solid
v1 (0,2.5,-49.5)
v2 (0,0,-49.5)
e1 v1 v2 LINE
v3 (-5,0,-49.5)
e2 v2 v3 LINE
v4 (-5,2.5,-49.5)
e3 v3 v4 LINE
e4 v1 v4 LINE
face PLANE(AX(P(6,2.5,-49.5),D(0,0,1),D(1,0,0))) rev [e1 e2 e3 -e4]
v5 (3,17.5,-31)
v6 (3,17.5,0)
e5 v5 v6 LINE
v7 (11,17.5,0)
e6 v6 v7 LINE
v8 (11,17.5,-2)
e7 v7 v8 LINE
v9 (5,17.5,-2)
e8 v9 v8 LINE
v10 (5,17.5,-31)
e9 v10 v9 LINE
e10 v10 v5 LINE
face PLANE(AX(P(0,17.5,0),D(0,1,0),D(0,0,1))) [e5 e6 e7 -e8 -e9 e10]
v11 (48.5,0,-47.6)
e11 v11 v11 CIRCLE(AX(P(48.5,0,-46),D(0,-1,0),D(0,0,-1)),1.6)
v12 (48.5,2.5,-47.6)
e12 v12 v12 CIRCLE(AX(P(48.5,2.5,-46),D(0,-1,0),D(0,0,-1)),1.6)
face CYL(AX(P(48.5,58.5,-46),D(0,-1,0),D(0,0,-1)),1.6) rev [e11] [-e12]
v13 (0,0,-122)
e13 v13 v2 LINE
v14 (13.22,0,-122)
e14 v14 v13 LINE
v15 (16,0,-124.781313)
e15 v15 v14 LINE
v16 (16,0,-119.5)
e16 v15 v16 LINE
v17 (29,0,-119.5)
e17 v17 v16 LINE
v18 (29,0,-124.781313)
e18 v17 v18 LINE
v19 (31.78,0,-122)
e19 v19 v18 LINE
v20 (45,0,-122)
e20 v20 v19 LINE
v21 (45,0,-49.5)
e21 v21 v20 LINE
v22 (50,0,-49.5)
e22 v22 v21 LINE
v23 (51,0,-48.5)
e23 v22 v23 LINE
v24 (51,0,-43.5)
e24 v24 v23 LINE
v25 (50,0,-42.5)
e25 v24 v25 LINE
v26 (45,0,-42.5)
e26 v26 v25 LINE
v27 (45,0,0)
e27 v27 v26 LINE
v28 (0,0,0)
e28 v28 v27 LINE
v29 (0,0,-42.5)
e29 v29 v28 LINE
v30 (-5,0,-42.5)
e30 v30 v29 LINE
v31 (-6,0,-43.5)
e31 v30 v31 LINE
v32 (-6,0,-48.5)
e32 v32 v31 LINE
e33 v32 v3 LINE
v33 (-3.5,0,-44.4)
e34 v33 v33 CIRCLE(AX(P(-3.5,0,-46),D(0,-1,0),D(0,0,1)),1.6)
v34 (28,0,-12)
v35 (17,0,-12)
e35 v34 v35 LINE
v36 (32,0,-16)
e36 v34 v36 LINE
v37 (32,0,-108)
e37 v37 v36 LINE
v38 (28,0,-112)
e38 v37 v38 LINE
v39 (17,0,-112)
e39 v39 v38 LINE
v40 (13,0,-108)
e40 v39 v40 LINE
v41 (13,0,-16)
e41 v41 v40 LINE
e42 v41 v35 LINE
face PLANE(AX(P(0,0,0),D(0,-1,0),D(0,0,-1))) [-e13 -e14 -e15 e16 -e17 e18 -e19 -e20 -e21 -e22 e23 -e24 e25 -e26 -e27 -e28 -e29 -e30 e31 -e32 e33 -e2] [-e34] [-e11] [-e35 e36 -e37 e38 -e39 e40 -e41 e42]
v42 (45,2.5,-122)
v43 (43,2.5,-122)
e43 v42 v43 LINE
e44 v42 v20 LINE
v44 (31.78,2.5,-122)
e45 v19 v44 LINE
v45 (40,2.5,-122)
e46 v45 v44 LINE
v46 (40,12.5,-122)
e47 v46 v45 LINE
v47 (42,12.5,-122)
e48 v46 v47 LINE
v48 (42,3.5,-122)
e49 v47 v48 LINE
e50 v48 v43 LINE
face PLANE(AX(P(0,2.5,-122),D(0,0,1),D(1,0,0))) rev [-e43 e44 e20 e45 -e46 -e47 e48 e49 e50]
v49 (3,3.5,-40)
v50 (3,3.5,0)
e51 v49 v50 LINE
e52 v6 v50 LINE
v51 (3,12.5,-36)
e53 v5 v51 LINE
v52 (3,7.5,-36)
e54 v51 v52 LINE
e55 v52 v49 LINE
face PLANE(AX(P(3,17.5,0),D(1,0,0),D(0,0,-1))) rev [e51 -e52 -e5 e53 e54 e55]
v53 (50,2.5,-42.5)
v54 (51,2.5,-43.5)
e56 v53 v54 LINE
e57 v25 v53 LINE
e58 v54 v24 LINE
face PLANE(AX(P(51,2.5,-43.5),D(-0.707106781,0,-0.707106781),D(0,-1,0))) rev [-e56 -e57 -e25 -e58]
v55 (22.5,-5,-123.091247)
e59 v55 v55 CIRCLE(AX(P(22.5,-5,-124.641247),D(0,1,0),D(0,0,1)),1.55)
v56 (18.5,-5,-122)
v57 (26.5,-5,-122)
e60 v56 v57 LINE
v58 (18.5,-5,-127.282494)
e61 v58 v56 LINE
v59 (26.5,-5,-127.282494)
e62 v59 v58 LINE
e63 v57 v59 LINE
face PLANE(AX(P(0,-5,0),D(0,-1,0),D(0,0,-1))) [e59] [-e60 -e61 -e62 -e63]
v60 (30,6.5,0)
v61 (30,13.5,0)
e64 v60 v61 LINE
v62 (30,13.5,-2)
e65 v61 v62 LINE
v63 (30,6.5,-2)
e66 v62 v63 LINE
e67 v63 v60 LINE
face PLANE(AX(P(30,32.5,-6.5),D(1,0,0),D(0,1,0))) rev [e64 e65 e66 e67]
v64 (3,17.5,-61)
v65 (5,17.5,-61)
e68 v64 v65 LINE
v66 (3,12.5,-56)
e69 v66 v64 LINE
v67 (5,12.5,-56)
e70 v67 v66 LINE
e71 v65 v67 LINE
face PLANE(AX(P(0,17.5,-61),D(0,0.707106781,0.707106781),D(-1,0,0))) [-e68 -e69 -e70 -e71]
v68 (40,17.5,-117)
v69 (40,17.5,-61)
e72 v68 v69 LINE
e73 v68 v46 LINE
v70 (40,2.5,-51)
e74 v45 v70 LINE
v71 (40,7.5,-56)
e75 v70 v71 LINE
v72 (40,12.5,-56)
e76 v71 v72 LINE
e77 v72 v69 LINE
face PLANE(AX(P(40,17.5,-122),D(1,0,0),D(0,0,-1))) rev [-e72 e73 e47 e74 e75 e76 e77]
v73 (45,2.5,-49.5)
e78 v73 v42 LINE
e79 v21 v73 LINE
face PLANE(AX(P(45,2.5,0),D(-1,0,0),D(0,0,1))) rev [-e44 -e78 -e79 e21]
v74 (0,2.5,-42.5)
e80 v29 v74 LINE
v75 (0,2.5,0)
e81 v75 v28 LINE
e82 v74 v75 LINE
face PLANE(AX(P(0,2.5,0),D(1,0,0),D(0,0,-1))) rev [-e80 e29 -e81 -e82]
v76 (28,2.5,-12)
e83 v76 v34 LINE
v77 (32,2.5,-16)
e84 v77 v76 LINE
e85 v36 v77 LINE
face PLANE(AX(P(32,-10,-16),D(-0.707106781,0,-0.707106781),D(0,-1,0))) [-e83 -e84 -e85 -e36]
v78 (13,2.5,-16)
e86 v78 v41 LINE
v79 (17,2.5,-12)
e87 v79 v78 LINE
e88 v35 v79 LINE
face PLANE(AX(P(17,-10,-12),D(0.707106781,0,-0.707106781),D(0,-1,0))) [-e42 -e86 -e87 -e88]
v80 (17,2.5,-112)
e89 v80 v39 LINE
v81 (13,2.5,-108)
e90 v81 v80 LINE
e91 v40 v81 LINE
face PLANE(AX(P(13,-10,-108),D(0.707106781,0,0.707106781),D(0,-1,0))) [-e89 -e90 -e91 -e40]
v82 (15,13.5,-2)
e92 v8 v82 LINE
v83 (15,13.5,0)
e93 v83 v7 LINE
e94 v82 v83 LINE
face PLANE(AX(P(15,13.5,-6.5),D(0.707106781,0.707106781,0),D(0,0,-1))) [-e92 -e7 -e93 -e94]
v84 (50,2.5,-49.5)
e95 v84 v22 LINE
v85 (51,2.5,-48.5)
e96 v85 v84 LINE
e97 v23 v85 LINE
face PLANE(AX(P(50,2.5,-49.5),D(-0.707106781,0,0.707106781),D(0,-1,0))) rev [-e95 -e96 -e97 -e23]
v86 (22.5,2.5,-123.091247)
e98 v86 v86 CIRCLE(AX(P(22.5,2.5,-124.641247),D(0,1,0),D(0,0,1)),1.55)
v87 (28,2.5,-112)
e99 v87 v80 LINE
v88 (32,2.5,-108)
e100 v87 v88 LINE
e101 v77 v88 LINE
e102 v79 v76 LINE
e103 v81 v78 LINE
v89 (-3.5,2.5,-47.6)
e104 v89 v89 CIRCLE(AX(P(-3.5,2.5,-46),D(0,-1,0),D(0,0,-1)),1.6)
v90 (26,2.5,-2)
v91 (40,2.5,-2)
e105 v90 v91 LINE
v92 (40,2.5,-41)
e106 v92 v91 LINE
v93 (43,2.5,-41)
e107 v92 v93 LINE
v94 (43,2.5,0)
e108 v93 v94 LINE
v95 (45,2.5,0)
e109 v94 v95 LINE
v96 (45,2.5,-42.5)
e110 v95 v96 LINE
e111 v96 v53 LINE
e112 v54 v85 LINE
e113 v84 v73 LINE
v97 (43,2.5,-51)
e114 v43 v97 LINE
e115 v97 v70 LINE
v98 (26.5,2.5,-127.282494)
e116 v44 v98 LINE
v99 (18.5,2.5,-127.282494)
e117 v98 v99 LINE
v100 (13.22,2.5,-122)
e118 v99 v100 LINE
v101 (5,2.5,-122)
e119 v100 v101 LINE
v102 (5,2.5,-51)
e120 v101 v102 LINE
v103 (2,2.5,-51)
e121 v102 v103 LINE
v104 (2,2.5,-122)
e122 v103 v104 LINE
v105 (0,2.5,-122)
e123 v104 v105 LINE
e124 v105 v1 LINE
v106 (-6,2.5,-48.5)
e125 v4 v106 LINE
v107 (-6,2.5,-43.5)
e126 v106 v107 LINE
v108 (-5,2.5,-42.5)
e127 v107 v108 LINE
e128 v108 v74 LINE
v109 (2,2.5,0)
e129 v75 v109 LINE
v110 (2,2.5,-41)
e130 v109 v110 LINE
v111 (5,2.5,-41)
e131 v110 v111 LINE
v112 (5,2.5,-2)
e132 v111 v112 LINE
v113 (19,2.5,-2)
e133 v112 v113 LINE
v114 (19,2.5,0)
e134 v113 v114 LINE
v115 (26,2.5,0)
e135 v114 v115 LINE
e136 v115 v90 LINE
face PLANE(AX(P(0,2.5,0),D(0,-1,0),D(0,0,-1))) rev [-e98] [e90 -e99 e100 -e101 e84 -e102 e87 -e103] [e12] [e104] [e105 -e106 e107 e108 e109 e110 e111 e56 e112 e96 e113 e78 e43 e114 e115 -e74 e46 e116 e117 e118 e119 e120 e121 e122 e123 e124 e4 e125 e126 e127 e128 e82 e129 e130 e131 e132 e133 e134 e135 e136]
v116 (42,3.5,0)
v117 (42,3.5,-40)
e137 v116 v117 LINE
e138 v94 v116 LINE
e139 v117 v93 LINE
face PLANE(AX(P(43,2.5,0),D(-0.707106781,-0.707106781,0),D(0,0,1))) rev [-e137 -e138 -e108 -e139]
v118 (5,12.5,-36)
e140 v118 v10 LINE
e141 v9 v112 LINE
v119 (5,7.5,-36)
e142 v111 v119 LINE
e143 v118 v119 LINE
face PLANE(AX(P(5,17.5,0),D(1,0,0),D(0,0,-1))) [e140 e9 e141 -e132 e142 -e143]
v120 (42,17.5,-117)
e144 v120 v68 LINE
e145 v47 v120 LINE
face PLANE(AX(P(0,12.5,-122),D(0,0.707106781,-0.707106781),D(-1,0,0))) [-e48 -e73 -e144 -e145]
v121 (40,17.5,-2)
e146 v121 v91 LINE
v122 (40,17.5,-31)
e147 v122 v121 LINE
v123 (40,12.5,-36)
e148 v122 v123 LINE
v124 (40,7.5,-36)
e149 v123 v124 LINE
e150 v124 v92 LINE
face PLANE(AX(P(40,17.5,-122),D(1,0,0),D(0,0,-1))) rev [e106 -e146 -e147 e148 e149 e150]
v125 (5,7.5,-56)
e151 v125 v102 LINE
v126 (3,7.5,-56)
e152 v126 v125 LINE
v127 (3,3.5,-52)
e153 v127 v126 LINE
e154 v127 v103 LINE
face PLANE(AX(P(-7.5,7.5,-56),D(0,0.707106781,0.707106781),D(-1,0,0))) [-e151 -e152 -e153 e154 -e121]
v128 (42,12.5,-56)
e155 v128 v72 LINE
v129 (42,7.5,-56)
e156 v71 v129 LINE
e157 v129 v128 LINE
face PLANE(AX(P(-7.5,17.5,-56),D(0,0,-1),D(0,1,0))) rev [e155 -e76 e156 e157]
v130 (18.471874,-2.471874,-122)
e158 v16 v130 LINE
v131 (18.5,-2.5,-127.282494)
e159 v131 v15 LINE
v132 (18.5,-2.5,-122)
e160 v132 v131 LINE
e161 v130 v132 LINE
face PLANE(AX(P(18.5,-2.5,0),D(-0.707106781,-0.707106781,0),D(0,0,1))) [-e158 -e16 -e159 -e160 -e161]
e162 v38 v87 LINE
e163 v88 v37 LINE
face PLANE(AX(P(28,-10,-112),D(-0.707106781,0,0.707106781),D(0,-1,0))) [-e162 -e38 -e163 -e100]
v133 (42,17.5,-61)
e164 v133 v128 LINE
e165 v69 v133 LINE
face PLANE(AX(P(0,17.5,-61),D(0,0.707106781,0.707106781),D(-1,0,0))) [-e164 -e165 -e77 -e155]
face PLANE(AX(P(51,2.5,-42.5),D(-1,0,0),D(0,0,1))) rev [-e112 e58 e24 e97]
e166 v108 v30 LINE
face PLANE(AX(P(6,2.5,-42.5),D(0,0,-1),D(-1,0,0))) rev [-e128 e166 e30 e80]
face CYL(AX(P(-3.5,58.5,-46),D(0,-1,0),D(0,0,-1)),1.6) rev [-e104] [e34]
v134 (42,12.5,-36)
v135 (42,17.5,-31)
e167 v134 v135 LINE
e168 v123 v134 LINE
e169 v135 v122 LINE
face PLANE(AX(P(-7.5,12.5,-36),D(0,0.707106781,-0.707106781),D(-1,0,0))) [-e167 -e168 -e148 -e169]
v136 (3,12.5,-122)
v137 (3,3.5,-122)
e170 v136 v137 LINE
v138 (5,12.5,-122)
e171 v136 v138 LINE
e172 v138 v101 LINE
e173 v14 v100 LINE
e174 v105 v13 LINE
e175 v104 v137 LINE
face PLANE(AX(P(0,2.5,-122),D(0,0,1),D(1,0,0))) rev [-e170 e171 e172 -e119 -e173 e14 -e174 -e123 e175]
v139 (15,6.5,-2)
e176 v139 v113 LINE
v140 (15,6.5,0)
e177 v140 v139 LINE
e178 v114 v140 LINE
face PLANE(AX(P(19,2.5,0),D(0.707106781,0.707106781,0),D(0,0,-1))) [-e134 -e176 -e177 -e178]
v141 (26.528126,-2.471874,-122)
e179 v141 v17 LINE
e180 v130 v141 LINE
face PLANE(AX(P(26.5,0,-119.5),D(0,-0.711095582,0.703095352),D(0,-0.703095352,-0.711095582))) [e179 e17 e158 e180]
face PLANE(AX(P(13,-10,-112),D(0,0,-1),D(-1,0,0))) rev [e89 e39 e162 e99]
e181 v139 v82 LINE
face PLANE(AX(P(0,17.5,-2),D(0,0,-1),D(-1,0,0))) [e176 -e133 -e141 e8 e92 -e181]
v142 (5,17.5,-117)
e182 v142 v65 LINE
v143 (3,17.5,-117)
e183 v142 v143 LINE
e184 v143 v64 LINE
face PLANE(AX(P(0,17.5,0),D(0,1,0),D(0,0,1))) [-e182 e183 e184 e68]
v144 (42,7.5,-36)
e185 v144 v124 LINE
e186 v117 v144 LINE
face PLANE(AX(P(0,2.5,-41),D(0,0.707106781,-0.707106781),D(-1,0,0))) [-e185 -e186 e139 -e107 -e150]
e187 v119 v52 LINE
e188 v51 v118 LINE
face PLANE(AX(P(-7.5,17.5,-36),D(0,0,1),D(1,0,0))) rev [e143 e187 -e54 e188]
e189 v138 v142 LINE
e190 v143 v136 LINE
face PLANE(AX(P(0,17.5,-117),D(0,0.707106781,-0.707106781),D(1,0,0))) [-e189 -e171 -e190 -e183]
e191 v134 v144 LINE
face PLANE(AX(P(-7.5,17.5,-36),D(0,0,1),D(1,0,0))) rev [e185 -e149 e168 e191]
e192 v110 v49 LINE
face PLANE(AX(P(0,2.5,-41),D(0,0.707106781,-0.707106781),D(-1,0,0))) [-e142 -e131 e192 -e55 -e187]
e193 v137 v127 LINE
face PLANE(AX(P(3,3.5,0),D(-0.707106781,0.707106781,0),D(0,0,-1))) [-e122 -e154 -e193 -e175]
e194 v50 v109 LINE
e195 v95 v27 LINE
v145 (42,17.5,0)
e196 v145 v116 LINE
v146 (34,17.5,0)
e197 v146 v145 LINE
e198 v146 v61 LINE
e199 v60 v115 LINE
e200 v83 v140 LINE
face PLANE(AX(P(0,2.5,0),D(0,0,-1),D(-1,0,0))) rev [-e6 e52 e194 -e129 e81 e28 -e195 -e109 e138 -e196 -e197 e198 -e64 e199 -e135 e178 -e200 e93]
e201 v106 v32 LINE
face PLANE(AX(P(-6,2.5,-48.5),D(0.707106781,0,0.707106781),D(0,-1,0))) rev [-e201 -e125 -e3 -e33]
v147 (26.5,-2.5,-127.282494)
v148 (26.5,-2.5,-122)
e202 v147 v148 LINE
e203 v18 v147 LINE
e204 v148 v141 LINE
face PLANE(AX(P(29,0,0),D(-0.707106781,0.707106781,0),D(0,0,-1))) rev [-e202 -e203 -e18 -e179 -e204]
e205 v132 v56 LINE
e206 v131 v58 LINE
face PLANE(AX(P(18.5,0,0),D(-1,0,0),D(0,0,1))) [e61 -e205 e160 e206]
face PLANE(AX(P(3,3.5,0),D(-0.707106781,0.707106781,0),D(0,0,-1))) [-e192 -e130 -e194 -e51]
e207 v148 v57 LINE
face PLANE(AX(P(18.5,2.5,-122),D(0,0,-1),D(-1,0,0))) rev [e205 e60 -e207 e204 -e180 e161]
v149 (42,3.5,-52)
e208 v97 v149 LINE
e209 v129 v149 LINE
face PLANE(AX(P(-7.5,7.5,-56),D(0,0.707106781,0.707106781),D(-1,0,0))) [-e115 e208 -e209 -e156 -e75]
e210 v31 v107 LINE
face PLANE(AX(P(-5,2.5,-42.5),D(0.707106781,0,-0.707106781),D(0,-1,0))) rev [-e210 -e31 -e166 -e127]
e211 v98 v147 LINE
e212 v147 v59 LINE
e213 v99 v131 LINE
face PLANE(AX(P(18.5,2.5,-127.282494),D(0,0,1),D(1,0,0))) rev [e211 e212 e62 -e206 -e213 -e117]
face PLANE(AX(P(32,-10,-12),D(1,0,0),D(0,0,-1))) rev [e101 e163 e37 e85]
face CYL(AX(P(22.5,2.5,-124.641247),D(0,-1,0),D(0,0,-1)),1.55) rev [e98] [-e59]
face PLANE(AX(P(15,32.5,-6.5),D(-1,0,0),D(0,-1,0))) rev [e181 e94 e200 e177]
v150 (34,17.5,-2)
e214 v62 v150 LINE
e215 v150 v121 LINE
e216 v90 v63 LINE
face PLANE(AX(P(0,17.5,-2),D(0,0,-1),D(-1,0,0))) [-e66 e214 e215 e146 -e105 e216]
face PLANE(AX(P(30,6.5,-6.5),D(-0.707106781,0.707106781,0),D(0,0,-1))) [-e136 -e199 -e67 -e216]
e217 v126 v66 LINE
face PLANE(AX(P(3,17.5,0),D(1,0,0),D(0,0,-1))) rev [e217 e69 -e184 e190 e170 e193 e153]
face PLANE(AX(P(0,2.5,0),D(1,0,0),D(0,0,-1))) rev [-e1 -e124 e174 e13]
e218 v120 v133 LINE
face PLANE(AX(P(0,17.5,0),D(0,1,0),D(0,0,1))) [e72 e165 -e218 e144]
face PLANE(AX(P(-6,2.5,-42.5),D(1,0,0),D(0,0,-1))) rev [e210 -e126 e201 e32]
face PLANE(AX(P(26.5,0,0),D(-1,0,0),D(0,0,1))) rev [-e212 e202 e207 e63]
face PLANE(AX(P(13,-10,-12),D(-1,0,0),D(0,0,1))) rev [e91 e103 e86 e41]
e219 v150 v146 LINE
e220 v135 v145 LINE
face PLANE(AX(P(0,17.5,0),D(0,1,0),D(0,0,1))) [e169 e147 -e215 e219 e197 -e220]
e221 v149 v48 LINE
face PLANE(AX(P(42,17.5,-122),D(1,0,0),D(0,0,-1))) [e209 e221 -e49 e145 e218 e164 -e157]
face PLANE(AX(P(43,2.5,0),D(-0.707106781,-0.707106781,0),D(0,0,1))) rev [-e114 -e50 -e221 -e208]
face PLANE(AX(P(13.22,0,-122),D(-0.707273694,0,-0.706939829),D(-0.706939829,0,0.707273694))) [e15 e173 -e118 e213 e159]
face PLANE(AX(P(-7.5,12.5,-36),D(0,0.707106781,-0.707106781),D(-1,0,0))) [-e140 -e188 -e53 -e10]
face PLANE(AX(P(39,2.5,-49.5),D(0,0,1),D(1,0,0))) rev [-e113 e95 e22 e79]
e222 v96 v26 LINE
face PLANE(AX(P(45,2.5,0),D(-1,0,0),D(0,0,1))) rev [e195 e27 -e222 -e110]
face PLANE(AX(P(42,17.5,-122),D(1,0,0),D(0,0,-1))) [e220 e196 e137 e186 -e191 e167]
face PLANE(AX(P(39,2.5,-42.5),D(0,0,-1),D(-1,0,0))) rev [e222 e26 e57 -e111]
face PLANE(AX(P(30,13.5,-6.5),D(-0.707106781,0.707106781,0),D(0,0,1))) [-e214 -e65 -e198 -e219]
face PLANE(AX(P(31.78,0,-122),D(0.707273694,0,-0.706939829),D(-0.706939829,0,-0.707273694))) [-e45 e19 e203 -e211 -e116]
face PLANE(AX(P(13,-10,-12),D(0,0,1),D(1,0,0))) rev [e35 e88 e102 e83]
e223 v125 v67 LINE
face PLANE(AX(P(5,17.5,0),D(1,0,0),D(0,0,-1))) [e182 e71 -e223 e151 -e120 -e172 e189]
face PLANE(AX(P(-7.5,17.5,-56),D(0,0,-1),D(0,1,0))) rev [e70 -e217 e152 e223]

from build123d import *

# Parameters (mm, degrees)
SKETCH1_W                = 45
SKETCH1_H                = 122
BOSS_EXTRUDE1_DEPTH      = 2.5
SKETCH3_W                = 35
SKETCH3_H                = 2
BOSS_EXTRUDE2_DEPTH      = 15
SKETCH4_W                = 12
SKETCH4_H                = 7
BOSS_EXTRUDE3_DEPTH      = 2.5
SKETCH6_W                = 19
SKETCH6_H                = 100
CUT_EXTRUDE2_DEPTH       = 12.5
FILLET1_SIZE             = 4
SKETCH8_W                = 20
SKETCH8_H                = 15
CUT_EXTRUDE3_DEPTH       = 58.5
FILLET2_SIZE             = 5
SKETCH9_R                = 1.6
CUT_EXTRUDE4_DEPTH       = 58.5
BOSS_EXTRUDE4_DEPTH      = 2.5
BOSS_EXTRUDE4_DEPTH_BACK = 5
SKETCH10_W               = 8
SKETCH10_H               = 5.282493572
SKETCH10_R               = 1.55
BOSS_EXTRUDE5_DEPTH      = 8
BOSS_EXTRUDE6_DEPTH      = 2.5
FILLET3_SIZE             = 2.5
SKETCH13_W               = 15
SKETCH13_H               = 30
CUT_EXTRUDE5_DEPTH       = 6.5
FILLET4_SIZE             = 4
FILLET5_SIZE             = 1
FILLET7_SIZE             = 1


with BuildPart() as part:
    # Sketch1 → Boss-Extrude1 (new body)
    with BuildSketch(Plane(origin=(0, 0, 0), x_dir=(1, 0, 0), z_dir=(0, 1, 0))):
        with Locations((22.5, 61)):
            Rectangle(SKETCH1_W, SKETCH1_H)
    extrude(amount=BOSS_EXTRUDE1_DEPTH)

    # Sketch3 → Boss-Extrude2 (add)
    with BuildSketch(Plane(origin=(0, 2.5, 0), x_dir=(1, 0, 0), z_dir=(0, 1, 0))):
        Polygon((5, 122), (3, 122), (3, 0), (5, 0), (5, 2), align=None)
        with Locations((22.5, 1)):
            Rectangle(SKETCH3_W, SKETCH3_H)
        Polygon((40, 122), (40, 2), (40, 0), (42, 0), (42, 122), align=None)
    extrude(amount=BOSS_EXTRUDE2_DEPTH)

    # Sketch4 → Boss-Extrude3 (add)
    with BuildSketch(Plane(origin=(0, 0, 0), x_dir=(1, 0, 0), z_dir=(0, 1, 0))):
        with Locations((0, 46)):
            Rectangle(SKETCH4_W, SKETCH4_H)
        with Locations((45, 46)):
            Rectangle(SKETCH4_W, SKETCH4_H)
    extrude(amount=BOSS_EXTRUDE3_DEPTH)

    # Sketch6 → Cut-Extrude2 (cut)
    with BuildSketch(Plane(origin=(0, 2.5, 0), x_dir=(1, 0, 0), z_dir=(0, 1, 0))):
        with Locations((22.5, 62)):
            Rectangle(SKETCH6_W, SKETCH6_H)
    extrude(amount=-CUT_EXTRUDE2_DEPTH, mode=Mode.SUBTRACT)

    # Fillet1
    fillet1_edges = [part.edges().sort_by_distance(p)[0] for p in [
        (32, 1.25, -112),
        (32, 1.25, -12),
        (13, 1.25, -12),
        (13, 1.25, -112),
    ]]
    chamfer(fillet1_edges, length=FILLET1_SIZE)

    # Sketch8 → Cut-Extrude3 (cut)
    with BuildSketch(Plane(origin=(51, 0, 0), x_dir=(0, 0, -1), z_dir=(1, 0, 0))):
        with Locations((46, 10)):
            Rectangle(SKETCH8_W, SKETCH8_H)
    extrude(amount=-CUT_EXTRUDE3_DEPTH, mode=Mode.SUBTRACT)

    # Fillet2
    fillet2_edges = [part.edges().sort_by_distance(p)[0] for p in [
        (4, 17.5, -56),
        (41, 17.5, -56),
        (4, 2.5, -36),
        (41, 2.5, -36),
        (4, 17.5, -36),
        (41, 17.5, -36),
        (4, 2.5, -56),
        (41, 2.5, -56),
        (4, 17.5, -122),
        (41, 17.5, -122),
    ]]
    chamfer(fillet2_edges, length=FILLET2_SIZE)

    # Sketch9 → Cut-Extrude4 (cut)
    with BuildSketch(Plane.XZ):
        with Locations(Location((48.5, -46, 0), (0, 0, 270))):
            Circle(SKETCH9_R)
        with Locations(Location((-3.5, -46, 0), (0, 0, 270))):
            Circle(SKETCH9_R)
    extrude(amount=-CUT_EXTRUDE4_DEPTH, mode=Mode.SUBTRACT)



with BuildPart() as body_2:
    # Sketch10 → Boss-Extrude4 (new, two sides: drawn at the far end of the back side and taken through both)
    with BuildSketch(Plane(origin=(0, 0, 0), x_dir=(1, 0, 0), z_dir=(0, 1, 0)).offset(-BOSS_EXTRUDE4_DEPTH_BACK)):
        with Locations((22.5, 124.641246786)):
            Rectangle(SKETCH10_W, SKETCH10_H)
        with Locations(Location((22.5, 124.641246786, 0), (0, 0, 270))):
            Circle(SKETCH10_R, mode=Mode.SUBTRACT)
    extrude(amount=BOSS_EXTRUDE4_DEPTH + BOSS_EXTRUDE4_DEPTH_BACK)


with BuildPart() as part_1:
    add(part.part)

    add(body_2.part)  # Boss-Extrude5 merges body 2
    # Sketch11 → Boss-Extrude5 (add)
    with BuildSketch(Plane.ZY.offset(-18.5)):
        Polygon((-119.5, 0), (-122.028446462, -2.5), (-122, 0), align=None)
    extrude(amount=-BOSS_EXTRUDE5_DEPTH)

    # Sketch12 → Boss-Extrude6 (add)
    with BuildSketch(Plane(origin=(0, 2.5, 0), x_dir=(1, 0, 0), z_dir=(0, 1, 0))):
        Polygon((18.5, 127.282493572), (18.5, 122), (13.22, 122), align=None)
        Polygon((26.5, 122), (31.78, 122), (26.5, 127.282493572), align=None)
    extrude(amount=-BOSS_EXTRUDE6_DEPTH)

    # Fillet3
    # the kernel refuses this chamfer: 2.5 mm, written as the material it adds along each edge
    with BuildSketch(Plane(origin=(26.5, 0, -113.07079253), x_dir=(0.9996219169112968, 0.027495876610586372, 0), z_dir=(0, 0, -1))) as fillet3_piece_1_section:
        Polygon((FILLET3_SIZE * 0.999621916911, FILLET3_SIZE * 0.0274958766106), (-FILLET3_SIZE * 0.0274958766106, FILLET3_SIZE * 0.999621916911), (0, 0), align=None)
    fillet3_piece_1 = extrude(amount=14.211701041, mode=Mode.PRIVATE)
    fillet3_piece_1 = split(fillet3_piece_1, bisect_by=Plane(origin=(26.425464868, -2.516462273, -122.045096052), z_dir=(0, -0.7110955817269744, 0.7030953517470985)), keep=Keep.TOP, mode=Mode.PRIVATE)
    fillet3_piece_1 = split(fillet3_piece_1, bisect_by=Plane(origin=(26.425464868, -2.531550229, -122), z_dir=(0, 0, -1)), keep=Keep.TOP, mode=Mode.PRIVATE)
    add(fillet3_piece_1)
    with BuildSketch(Plane(origin=(26.5, 0, -113.07079253), x_dir=(0.9996219169112968, 0.027495876610586372, 0), z_dir=(0, 0, -1))) as fillet3_piece_2_section:
        Polygon((FILLET3_SIZE * 0.999621916911, FILLET3_SIZE * 0.0274958766106), (-FILLET3_SIZE * 0.0274958766106, FILLET3_SIZE * 0.999621916911), (0, 0), align=None)
    fillet3_piece_2 = extrude(amount=14.211701041, mode=Mode.PRIVATE)
    fillet3_piece_2 = split(fillet3_piece_2, bisect_by=Plane(origin=(27.453210407, -1.061082343, -120.573155958), z_dir=(0, 0.7110955817269744, -0.7030953517470985)), keep=Keep.TOP, mode=Mode.PRIVATE)
    fillet3_piece_2 = split(fillet3_piece_2, bisect_by=Plane(origin=(27.453210407, -0.58369775, -122), z_dir=(0, 0, 1)), keep=Keep.TOP, mode=Mode.PRIVATE)
    add(fillet3_piece_2)
    with BuildSketch(Plane(origin=(26.5, 0, -113.07079253), x_dir=(0.9996219169112968, 0.027495876610586372, 0), z_dir=(0, 0, -1))) as fillet3_piece_3_section:
        Polygon((FILLET3_SIZE * 0.999621916911, FILLET3_SIZE * 0.0274958766106), (-FILLET3_SIZE * 0.0274958766106, FILLET3_SIZE * 0.999621916911), (0, 0), align=None)
    fillet3_piece_3 = extrude(amount=14.211701041, mode=Mode.PRIVATE)
    fillet3_piece_3 = split(fillet3_piece_3, bisect_by=Plane(origin=(27.235712014, -2.816950005, -122.349002909), z_dir=(0, 0.7110955817269744, -0.7030953517470985)), keep=Keep.TOP, mode=Mode.PRIVATE)
    fillet3_piece_3 = split(fillet3_piece_3, bisect_by=Plane(origin=(28.372764332, -0.871738969, -125.408844794), z_dir=(-0.7072736937748051, 0, 0.7069398291892623)), keep=Keep.TOP, mode=Mode.PRIVATE)
    fillet3_piece_3 = split(fillet3_piece_3, bisect_by=Plane(origin=(27.235712014, -0.871738969, -122), z_dir=(0, 0, -1)), keep=Keep.TOP, mode=Mode.PRIVATE)
    add(fillet3_piece_3)
    with BuildSketch(Plane(origin=(18.5, 0, -127.282493572), x_dir=(0.027495876610586317, -0.9996219169112968, 0), z_dir=(0, 0, 1))) as fillet3_piece_4_section:
        Polygon((FILLET3_SIZE * 0.999621916911, -FILLET3_SIZE * 0.0274958766106), (-FILLET3_SIZE * 0.0274958766106, -FILLET3_SIZE * 0.999621916911), (0, 0), align=None)
    fillet3_piece_4 = extrude(amount=14.211701041, mode=Mode.PRIVATE)
    fillet3_piece_4 = split(fillet3_piece_4, bisect_by=Plane(origin=(17.764287986, -2.816950005, -122.349002909), z_dir=(0, 0.7110955817269744, -0.7030953517470985)), keep=Keep.TOP, mode=Mode.PRIVATE)
    fillet3_piece_4 = split(fillet3_piece_4, bisect_by=Plane(origin=(17.764287986, -0.871738969, -122), z_dir=(0, 0, -1)), keep=Keep.TOP, mode=Mode.PRIVATE)
    fillet3_piece_4 = split(fillet3_piece_4, bisect_by=Plane(origin=(16.627235668, -0.871738969, -125.408844794), z_dir=(0.7072736937748045, 0, 0.7069398291892628)), keep=Keep.TOP, mode=Mode.PRIVATE)
    add(fillet3_piece_4)
    with BuildSketch(Plane(origin=(18.5, 0, -127.282493572), x_dir=(0.027495876610586317, -0.9996219169112968, 0), z_dir=(0, 0, 1))) as fillet3_piece_5_section:
        Polygon((FILLET3_SIZE * 0.999621916911, -FILLET3_SIZE * 0.0274958766106), (-FILLET3_SIZE * 0.0274958766106, -FILLET3_SIZE * 0.999621916911), (0, 0), align=None)
    fillet3_piece_5 = extrude(amount=14.211701041, mode=Mode.PRIVATE)
    fillet3_piece_5 = split(fillet3_piece_5, bisect_by=Plane(origin=(17.546789593, -1.061082343, -120.573155958), z_dir=(0, 0.7110955817269744, -0.7030953517470985)), keep=Keep.TOP, mode=Mode.PRIVATE)
    fillet3_piece_5 = split(fillet3_piece_5, bisect_by=Plane(origin=(17.546789593, -0.58369775, -122), z_dir=(0, 0, 1)), keep=Keep.TOP, mode=Mode.PRIVATE)
    add(fillet3_piece_5)
    with BuildSketch(Plane(origin=(18.5, 0, -127.282493572), x_dir=(0.027495876610586317, -0.9996219169112968, 0), z_dir=(0, 0, 1))) as fillet3_piece_6_section:
        Polygon((FILLET3_SIZE * 0.999621916911, -FILLET3_SIZE * 0.0274958766106), (-FILLET3_SIZE * 0.0274958766106, -FILLET3_SIZE * 0.999621916911), (0, 0), align=None)
    fillet3_piece_6 = extrude(amount=14.211701041, mode=Mode.PRIVATE)
    fillet3_piece_6 = split(fillet3_piece_6, bisect_by=Plane(origin=(18.574535132, -2.516462273, -122.045096052), z_dir=(0, -0.7110955817269744, 0.7030953517470985)), keep=Keep.TOP, mode=Mode.PRIVATE)
    fillet3_piece_6 = split(fillet3_piece_6, bisect_by=Plane(origin=(18.574535132, -2.531550229, -122), z_dir=(0, 0, -1)), keep=Keep.TOP, mode=Mode.PRIVATE)
    add(fillet3_piece_6)

    # Sketch13 → Cut-Extrude5 (cut)
    with BuildSketch(Plane.XY):
        with Locations((22.5, 17.5)):
            Rectangle(SKETCH13_W, SKETCH13_H)
    extrude(amount=-CUT_EXTRUDE5_DEPTH, mode=Mode.SUBTRACT)

    # Fillet4
    fillet4_edges = [part_1.edges().sort_by_distance(p)[0] for p in [
        (30, 17.5, -1),
        (15, 17.5, -1),
        (30, 2.5, -1),
        (15, 2.5, -1),
    ]]
    chamfer(fillet4_edges, length=FILLET4_SIZE)

    # Fillet5
    fillet5_edges = [part_1.edges().sort_by_distance(p)[0] for p in [
        (42, 2.5, -20.5),
        (3, 2.5, -20.5),
        (3, 2.5, -86.5),
        (42, 2.5, -86.5),
    ]]
    chamfer(fillet5_edges, length=FILLET5_SIZE)

    # Fillet7
    fillet7_edges = [part_1.edges().sort_by_distance(p)[0] for p in [
        (-6, 1.25, -42.5),
        (-6, 1.25, -49.5),
        (51, 1.25, -49.5),
        (51, 1.25, -42.5),
    ]]
    chamfer(fillet7_edges, length=FILLET7_SIZE)


solid = part_1.part
